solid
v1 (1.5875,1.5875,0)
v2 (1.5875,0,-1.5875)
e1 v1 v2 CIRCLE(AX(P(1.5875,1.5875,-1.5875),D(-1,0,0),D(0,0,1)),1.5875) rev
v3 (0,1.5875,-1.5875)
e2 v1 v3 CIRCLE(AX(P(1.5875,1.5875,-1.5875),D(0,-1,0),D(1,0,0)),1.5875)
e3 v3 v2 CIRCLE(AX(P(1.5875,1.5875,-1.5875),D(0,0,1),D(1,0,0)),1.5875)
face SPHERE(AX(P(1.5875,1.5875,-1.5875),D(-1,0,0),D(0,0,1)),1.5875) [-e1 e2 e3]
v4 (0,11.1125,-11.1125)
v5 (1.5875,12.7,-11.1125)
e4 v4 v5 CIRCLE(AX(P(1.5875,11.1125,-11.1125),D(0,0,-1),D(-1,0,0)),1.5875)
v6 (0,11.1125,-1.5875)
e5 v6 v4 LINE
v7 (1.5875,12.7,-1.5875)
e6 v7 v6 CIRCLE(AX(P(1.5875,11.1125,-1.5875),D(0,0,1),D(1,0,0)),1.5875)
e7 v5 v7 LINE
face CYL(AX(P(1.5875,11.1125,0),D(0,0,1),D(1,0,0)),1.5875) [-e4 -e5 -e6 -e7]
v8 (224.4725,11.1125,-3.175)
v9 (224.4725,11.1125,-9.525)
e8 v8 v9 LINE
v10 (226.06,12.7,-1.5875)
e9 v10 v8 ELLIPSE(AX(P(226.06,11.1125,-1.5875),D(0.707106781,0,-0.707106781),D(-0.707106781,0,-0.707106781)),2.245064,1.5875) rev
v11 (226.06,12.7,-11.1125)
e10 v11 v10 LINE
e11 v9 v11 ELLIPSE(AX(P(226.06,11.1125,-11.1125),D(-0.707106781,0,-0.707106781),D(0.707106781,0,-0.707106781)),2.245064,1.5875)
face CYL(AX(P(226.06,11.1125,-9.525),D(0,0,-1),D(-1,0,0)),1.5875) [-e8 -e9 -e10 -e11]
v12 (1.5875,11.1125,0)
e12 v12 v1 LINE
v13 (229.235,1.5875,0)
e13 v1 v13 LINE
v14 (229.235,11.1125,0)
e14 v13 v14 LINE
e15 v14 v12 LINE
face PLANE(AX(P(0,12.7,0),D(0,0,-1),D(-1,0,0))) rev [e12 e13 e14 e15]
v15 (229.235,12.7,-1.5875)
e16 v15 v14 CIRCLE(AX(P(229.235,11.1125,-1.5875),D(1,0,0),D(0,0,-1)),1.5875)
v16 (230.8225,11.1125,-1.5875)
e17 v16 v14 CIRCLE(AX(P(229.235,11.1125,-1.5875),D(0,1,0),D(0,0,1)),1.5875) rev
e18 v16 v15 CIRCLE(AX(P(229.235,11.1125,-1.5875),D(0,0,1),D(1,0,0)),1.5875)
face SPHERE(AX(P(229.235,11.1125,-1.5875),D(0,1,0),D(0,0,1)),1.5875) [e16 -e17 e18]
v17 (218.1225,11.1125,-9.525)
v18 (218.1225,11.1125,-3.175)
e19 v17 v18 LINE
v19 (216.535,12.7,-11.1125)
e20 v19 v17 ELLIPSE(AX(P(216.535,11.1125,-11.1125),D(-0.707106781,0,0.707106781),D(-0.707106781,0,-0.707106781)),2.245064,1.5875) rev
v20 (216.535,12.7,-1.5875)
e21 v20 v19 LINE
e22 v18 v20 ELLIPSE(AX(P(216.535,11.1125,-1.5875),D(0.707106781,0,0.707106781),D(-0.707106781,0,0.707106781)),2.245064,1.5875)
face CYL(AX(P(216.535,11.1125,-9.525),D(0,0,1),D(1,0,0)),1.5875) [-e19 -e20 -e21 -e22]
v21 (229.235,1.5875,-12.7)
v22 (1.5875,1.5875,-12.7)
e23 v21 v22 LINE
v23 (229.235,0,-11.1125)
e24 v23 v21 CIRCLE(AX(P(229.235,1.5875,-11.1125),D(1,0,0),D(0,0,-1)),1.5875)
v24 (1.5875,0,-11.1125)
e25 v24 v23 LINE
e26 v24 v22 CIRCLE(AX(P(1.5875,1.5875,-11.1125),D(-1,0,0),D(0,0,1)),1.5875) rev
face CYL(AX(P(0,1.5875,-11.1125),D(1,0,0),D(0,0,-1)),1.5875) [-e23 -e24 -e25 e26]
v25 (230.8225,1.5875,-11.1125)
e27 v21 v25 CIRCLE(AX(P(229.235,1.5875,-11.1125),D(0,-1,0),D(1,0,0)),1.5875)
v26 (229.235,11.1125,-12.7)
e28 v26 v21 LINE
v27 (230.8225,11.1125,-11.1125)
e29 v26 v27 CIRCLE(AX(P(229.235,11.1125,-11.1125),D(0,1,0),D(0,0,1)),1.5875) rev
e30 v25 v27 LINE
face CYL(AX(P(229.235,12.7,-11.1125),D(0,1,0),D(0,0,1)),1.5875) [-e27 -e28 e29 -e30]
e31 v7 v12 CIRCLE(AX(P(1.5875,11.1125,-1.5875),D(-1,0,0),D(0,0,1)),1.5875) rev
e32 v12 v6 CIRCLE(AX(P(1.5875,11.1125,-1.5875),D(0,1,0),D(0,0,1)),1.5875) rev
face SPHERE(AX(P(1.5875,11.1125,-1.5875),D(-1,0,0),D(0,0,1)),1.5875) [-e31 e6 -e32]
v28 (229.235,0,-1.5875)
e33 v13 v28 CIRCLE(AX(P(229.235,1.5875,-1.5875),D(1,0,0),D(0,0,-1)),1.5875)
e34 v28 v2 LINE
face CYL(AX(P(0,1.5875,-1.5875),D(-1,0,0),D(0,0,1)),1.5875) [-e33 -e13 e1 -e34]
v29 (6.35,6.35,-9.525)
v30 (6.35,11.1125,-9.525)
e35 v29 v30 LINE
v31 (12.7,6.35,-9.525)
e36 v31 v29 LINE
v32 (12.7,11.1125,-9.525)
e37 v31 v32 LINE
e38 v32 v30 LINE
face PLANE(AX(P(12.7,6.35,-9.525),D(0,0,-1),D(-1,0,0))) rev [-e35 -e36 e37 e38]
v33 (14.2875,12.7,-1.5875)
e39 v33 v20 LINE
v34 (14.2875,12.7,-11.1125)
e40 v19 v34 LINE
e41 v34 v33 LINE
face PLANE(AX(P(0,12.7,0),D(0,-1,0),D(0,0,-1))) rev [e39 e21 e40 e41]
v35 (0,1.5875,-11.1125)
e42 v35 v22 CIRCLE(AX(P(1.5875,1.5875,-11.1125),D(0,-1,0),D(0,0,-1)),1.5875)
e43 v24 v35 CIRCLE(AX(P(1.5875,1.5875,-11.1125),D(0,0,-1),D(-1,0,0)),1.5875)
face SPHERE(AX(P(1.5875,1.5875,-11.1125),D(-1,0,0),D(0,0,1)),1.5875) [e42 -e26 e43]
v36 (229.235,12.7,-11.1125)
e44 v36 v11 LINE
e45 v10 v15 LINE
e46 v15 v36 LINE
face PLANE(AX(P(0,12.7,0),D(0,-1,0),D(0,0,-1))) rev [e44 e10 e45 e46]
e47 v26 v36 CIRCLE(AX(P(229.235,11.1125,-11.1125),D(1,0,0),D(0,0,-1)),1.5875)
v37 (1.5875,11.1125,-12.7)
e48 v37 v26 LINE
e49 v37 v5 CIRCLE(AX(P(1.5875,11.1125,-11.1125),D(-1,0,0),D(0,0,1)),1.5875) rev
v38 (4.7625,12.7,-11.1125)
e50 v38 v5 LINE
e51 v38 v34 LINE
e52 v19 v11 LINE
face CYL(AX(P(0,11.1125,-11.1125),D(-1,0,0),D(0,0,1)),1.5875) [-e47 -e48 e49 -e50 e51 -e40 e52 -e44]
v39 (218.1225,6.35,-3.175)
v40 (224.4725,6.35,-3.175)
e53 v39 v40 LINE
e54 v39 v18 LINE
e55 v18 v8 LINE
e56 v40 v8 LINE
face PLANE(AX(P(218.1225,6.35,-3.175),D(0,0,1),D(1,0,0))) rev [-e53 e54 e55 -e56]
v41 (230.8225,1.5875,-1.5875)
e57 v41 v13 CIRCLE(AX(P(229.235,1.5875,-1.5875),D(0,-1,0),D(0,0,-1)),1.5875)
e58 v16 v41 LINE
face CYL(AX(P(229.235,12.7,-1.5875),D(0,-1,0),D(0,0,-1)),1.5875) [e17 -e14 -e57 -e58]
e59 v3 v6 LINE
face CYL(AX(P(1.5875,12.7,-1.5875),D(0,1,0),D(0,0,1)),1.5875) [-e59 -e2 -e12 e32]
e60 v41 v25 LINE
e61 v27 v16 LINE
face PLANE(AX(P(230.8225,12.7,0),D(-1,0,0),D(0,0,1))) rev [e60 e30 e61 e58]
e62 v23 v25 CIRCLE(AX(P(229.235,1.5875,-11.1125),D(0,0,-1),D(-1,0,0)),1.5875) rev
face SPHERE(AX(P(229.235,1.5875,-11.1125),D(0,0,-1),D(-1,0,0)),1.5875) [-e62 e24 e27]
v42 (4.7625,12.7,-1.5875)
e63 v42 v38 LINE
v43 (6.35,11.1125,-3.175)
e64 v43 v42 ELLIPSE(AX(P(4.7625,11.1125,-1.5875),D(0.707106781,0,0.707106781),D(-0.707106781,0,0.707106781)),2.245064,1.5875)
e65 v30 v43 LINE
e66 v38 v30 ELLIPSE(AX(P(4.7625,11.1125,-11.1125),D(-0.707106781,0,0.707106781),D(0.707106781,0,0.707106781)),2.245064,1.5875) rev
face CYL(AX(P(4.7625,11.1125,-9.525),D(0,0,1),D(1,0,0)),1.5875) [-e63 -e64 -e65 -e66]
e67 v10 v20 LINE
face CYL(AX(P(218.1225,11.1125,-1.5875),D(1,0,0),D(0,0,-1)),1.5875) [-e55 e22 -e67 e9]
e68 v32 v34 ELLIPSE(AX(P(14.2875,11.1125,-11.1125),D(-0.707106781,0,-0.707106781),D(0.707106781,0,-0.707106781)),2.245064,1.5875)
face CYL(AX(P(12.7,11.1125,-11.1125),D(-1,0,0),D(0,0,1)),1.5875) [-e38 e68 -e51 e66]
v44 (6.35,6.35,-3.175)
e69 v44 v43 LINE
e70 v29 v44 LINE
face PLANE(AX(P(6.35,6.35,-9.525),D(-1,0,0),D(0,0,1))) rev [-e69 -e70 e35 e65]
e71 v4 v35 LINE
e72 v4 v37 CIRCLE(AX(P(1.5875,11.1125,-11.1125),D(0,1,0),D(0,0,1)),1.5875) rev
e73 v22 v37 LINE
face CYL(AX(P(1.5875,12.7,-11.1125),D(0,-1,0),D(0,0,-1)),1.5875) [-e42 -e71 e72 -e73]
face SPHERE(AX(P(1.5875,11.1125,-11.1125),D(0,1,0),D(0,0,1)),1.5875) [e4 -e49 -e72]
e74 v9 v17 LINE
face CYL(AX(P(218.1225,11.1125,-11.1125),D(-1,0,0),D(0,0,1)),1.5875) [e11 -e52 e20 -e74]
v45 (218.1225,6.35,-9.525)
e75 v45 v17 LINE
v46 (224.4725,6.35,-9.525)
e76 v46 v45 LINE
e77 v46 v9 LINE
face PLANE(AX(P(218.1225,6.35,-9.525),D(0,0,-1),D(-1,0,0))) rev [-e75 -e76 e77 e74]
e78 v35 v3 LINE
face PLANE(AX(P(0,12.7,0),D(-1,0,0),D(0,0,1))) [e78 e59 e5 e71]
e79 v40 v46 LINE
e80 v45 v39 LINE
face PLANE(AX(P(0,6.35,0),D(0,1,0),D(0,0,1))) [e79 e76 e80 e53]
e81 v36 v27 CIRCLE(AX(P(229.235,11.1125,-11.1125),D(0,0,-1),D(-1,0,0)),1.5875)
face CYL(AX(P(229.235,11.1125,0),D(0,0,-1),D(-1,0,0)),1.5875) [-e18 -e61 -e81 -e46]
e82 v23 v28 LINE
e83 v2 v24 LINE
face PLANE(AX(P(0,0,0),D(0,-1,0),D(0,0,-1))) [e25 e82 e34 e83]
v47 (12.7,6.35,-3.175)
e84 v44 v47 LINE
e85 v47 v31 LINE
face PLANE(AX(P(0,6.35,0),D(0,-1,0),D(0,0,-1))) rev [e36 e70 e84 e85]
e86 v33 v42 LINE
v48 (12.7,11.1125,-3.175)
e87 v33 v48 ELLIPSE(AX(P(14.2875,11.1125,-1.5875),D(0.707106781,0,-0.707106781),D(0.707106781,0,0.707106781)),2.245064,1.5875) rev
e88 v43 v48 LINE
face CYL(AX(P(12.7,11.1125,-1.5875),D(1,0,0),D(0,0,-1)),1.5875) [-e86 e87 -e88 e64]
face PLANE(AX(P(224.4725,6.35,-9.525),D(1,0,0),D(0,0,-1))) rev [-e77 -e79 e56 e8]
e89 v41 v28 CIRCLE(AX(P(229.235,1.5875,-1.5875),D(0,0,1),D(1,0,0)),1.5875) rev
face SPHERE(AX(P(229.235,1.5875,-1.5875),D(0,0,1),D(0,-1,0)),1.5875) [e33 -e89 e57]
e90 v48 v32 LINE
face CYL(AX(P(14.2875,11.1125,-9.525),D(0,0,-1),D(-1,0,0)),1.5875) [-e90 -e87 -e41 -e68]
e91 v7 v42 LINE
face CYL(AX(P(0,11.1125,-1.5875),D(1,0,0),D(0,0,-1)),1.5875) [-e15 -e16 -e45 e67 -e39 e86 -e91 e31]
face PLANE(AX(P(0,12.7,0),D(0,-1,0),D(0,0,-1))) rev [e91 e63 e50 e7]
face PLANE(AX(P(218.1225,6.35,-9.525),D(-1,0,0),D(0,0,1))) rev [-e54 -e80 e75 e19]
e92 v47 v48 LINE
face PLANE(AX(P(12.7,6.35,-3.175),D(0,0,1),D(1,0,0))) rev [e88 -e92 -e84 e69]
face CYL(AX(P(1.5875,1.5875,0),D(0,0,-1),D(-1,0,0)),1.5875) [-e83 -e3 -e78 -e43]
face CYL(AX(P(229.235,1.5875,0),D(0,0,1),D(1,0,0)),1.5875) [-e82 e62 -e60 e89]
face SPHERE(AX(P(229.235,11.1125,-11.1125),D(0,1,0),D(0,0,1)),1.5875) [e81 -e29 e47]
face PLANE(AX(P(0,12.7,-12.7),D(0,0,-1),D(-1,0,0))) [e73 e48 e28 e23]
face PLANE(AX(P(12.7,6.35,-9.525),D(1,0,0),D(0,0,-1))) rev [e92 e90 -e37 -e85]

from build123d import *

# Parameters (mm, degrees)
SKETCH1_W           = 230.8225
SKETCH1_H           = 12.7
BOSS_EXTRUDE1_DEPTH = 12.7
SKETCH2_W           = 6.35
SKETCH2_H           = 6.35
CUT_EXTRUDE1_DEPTH  = 6.35
FILLET1_R           = 1.5875


with BuildPart() as part:
    # Sketch1 → Boss-Extrude1 (new body)
    with BuildSketch(Plane(origin=(0, 0, 0), x_dir=(1, 0, 0), z_dir=(0, 1, 0))):
        with Locations((115.41125, 6.35)):
            Rectangle(SKETCH1_W, SKETCH1_H)
    extrude(amount=BOSS_EXTRUDE1_DEPTH)

    # Sketch2 → Cut-Extrude1 (cut)
    with BuildSketch(Plane(origin=(0, 12.7, 0), x_dir=(1, 0, 0), z_dir=(0, 1, 0))):
        with Locations((221.2975, 6.35)):
            Rectangle(SKETCH2_W, SKETCH2_H)
        with Locations((9.525, 6.35)):
            Rectangle(SKETCH2_W, SKETCH2_H)
    extrude(amount=-CUT_EXTRUDE1_DEPTH, mode=Mode.SUBTRACT)

    # Fillet1
    fillet1_edges = [part.edges().sort_by_distance(p)[0] for p in [
        (230.8225, 12.7, -6.35),
        (115.41125, 12.7, 0),
        (218.1225, 12.7, -6.35),
        (221.2975, 12.7, -3.175),
        (224.4725, 12.7, -6.35),
        (221.2975, 12.7, -9.525),
        (12.7, 12.7, -6.35),
        (9.525, 12.7, -9.525),
        (6.35, 12.7, -6.35),
        (9.525, 12.7, -3.175),
        (0, 12.7, -6.35),
        (115.41125, 0, 0),
        (230.8225, 0, -6.35),
        (115.41125, 0, -12.7),
        (0, 0, -6.35),
        (0, 6.35, 0),
        (230.8225, 6.35, 0),
        (230.8225, 6.35, -12.7),
        (0, 6.35, -12.7),
        (115.41125, 12.7, -12.7),
    ]]
    fillet(fillet1_edges, radius=FILLET1_R - 0.0001)  # a hair under: the kernel refuses the full size


solid = part.part
